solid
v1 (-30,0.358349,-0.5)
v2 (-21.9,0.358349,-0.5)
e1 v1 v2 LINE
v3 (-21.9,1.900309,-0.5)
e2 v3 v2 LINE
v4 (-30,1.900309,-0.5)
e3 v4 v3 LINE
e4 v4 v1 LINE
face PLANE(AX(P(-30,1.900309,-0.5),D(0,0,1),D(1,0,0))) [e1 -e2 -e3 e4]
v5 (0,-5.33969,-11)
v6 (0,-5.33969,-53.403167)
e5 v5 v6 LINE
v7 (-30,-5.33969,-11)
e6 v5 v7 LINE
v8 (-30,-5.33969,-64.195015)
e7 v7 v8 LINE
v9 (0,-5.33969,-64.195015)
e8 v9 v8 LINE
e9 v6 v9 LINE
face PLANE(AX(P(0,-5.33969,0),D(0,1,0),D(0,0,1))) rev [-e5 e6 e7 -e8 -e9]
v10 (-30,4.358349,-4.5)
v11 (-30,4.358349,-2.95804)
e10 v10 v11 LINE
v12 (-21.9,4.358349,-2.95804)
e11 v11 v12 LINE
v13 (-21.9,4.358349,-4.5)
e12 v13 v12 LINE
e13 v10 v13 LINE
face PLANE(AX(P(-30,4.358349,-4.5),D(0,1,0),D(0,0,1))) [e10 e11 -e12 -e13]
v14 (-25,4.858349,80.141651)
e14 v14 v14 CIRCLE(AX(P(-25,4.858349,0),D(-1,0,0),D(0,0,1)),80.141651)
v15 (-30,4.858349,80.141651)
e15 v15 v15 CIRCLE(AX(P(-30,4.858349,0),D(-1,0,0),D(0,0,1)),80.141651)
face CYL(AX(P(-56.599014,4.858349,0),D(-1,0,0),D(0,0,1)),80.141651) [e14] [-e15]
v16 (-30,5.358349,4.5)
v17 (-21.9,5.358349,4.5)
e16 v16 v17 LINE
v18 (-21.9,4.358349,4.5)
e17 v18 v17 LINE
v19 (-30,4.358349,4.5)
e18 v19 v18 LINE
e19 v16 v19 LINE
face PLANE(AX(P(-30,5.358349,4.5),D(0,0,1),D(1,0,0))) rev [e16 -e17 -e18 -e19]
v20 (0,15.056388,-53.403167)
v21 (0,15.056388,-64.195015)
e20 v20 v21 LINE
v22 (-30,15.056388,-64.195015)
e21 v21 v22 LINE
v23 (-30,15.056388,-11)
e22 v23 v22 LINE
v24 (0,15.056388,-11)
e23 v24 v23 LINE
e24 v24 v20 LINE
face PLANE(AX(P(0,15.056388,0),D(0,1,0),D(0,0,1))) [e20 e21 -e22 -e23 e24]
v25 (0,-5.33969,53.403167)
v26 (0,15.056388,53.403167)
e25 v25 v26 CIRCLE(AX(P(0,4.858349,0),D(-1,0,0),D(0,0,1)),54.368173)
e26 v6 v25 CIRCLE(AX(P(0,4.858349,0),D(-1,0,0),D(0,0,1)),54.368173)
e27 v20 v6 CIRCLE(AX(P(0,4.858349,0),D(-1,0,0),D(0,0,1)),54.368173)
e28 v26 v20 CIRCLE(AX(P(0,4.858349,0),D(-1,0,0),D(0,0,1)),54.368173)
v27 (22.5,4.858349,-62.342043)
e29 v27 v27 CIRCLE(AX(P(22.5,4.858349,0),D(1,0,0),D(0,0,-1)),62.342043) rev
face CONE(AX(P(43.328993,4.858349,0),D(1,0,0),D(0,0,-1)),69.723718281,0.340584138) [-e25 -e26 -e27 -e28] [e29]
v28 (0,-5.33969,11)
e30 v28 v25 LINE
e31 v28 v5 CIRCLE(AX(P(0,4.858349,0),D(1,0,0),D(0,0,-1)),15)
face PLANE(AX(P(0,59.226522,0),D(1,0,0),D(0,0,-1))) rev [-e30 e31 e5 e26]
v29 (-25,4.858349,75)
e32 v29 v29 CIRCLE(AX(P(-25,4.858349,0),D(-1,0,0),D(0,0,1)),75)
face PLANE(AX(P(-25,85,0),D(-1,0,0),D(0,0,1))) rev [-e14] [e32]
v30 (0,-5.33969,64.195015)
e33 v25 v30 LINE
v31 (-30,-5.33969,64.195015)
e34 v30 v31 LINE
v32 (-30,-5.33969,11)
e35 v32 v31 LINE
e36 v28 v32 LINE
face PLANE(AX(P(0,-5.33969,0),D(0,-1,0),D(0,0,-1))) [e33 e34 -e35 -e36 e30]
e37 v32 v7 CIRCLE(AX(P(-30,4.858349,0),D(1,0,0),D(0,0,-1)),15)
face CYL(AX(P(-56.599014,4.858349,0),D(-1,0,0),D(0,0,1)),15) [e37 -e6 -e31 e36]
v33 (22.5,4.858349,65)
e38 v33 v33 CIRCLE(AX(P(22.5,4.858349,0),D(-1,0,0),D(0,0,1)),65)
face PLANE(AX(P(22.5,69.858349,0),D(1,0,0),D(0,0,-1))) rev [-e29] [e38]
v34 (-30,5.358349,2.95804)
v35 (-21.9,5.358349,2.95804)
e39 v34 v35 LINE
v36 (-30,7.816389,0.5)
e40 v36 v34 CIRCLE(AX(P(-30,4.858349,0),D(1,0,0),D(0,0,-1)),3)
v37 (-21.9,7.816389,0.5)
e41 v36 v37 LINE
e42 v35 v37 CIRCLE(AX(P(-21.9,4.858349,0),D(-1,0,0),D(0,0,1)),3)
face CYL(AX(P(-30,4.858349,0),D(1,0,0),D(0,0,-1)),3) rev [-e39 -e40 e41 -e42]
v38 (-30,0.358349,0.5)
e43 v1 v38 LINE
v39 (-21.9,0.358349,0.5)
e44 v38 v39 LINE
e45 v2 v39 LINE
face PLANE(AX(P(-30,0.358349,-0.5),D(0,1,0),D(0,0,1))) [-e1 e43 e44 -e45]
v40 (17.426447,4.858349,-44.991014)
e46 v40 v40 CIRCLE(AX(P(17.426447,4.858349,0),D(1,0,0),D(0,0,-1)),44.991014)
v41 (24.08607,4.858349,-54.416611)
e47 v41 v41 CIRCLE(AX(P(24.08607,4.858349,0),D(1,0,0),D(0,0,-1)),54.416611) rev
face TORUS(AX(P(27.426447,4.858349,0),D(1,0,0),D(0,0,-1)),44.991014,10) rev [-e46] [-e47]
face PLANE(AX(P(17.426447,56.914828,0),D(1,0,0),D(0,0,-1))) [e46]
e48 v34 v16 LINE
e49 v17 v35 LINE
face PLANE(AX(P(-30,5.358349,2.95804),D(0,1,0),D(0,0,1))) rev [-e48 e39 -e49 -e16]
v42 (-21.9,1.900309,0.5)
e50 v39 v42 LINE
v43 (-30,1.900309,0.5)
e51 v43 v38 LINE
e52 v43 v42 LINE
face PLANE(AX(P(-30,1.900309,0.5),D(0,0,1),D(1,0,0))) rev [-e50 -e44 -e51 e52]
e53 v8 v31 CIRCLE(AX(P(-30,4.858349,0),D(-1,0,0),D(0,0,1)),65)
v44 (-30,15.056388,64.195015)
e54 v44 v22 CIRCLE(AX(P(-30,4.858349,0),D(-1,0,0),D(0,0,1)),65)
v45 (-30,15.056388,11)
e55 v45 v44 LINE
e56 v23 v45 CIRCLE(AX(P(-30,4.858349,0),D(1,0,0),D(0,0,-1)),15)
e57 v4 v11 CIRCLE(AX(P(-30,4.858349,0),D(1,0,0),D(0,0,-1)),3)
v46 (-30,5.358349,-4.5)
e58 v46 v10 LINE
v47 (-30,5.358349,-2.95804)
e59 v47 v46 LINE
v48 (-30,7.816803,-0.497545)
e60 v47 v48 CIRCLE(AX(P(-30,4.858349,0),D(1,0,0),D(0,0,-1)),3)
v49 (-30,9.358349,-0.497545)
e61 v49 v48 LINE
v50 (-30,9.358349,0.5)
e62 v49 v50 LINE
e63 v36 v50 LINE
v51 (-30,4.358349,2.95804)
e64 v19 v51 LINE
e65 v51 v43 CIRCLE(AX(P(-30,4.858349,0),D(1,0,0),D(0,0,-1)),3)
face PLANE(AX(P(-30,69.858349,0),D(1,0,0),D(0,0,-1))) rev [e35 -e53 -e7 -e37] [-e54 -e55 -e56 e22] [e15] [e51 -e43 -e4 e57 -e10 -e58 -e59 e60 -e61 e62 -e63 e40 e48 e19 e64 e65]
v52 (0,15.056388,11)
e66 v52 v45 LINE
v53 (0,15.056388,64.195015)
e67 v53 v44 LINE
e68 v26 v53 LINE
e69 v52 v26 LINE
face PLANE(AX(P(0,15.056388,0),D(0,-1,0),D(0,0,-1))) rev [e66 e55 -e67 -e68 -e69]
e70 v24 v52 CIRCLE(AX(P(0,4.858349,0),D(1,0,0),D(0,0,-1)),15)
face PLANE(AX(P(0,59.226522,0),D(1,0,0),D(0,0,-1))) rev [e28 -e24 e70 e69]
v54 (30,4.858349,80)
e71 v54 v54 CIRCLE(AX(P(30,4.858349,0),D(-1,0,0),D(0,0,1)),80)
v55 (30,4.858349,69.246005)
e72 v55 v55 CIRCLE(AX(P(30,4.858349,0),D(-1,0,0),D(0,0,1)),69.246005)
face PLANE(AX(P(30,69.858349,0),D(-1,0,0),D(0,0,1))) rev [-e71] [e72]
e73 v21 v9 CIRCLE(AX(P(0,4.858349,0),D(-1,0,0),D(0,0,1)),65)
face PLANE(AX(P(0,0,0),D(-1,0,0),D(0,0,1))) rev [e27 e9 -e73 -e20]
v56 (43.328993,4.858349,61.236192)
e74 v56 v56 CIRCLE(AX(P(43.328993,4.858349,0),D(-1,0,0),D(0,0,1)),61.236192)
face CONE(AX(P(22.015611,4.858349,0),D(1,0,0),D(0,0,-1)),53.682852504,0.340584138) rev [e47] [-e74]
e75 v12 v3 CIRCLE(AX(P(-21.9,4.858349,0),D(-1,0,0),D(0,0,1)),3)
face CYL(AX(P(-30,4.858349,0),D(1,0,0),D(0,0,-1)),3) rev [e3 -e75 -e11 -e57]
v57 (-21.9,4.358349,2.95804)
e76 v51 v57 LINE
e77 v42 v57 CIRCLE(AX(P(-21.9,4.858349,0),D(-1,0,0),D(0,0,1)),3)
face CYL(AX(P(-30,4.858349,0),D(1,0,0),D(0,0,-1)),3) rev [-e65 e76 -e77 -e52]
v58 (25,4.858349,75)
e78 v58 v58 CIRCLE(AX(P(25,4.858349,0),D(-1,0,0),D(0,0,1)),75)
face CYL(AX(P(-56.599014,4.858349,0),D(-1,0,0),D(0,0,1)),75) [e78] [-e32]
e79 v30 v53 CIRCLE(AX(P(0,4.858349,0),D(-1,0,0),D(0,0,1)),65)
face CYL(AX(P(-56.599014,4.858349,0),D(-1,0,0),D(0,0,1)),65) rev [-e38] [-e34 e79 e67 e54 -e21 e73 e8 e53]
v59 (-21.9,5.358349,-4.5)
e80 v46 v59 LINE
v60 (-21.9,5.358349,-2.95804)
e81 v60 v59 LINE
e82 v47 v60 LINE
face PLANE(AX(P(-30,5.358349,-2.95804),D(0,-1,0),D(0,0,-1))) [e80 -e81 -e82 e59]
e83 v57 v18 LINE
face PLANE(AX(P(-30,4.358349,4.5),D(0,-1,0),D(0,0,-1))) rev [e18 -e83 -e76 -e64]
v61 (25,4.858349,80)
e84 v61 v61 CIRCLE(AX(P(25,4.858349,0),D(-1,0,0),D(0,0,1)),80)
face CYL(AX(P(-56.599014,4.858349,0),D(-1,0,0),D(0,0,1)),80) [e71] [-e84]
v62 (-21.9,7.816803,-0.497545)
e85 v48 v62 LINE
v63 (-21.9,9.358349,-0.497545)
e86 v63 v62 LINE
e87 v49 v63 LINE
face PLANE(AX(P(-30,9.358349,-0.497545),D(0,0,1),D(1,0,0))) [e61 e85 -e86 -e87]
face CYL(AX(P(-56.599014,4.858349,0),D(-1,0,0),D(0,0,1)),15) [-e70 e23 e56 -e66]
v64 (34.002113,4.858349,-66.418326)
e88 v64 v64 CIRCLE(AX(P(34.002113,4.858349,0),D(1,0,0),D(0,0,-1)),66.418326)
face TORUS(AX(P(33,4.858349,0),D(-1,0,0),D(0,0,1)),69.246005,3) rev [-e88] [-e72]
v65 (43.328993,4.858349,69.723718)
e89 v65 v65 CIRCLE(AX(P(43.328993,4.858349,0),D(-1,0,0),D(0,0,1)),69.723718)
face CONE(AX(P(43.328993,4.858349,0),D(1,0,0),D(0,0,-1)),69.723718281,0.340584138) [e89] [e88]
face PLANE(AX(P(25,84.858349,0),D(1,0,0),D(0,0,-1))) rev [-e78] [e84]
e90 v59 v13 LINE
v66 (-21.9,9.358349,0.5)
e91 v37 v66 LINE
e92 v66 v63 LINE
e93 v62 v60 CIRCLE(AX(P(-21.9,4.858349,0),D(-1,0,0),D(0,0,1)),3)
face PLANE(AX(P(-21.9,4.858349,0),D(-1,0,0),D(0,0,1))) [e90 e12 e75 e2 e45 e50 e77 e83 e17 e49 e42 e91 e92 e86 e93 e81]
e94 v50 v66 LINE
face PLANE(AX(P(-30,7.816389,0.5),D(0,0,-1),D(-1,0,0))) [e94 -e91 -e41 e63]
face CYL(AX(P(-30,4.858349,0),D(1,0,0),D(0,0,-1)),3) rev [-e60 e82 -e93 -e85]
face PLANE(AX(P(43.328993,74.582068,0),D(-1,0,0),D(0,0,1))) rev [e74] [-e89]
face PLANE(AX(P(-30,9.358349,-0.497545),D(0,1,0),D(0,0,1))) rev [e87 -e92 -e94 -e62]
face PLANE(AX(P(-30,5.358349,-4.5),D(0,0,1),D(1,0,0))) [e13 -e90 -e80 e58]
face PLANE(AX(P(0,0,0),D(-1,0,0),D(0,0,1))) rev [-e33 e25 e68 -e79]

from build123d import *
from build123d.topology import SkipClean

# Parameters (mm, degrees)
ESBO_O2_R                = 15
RESSALTO_EXTRUS_O1_DEPTH = 30
FILETE1_R                = 10
FILETE5_R                = 3
RESSALTO_EXTRUS_O3_DEPTH = 30
RESSALTO_EXTRUS_O4_START = -30
ESBO_O9_R                = 3
RESSALTO_EXTRUS_O4_DEPTH = 30
ESBO_O10_R               = 3
RESSALTO_EXTRUS_O5_DEPTH = 2
CORTE_EXTRUS_O1_START    = -0.3
ESBO_O14_R               = 3
CORTE_EXTRUS_O1_DEPTH    = 0.3
RESSALTO_EXTRUS_O6_START = -27
RESSALTO_EXTRUS_O6_DEPTH = 27


with BuildPart() as part:
    # Esboço1 → Revolução2 (revolve)
    with BuildSketch(Plane.XY, mode=Mode.PRIVATE) as revolu_o2_sk:
        Polygon((30, 69.858349347), (30, 4.858349347), (0, 4.858349347), (0, 19.858349347), (22.5, 19.858349347), (22.5, 69.858349347), (-30, 69.858349347), (-30, 85), (-25, 85), (-25, 79.858349347), (25, 79.858349347), (25, 84.858349347), (30, 84.858349347), align=None)
    revolve(revolu_o2_sk.sketch.rotate(Axis((-56.599013794, 4.858349347, 0), (1, 0, 0)), 90), axis=Axis((-56.599013794, 4.858349347, 0), (1, 0, 0)))

    # Esboço2 → Ressalto-extrusão1 (add)
    with BuildSketch(Plane(origin=(0, 0, 0), x_dir=(0, 0, -1), z_dir=(1, 0, 0))):
        with Locations(Location((0, 4.858349347, 0), (0, 0, 180))):
            Circle(ESBO_O2_R)
        with BuildLine():
            Line((-2.958039892, 5.358349347), (-4.5, 5.358349347))
            Line((-4.5, 5.358349347), (-4.5, 4.358349347))
            Line((-4.5, 4.358349347), (-2.958039892, 4.358349347))
            ThreePointArc((-2.958039892, 4.358349347), (-2.121320344, 2.737029004), (-0.5, 1.900309456))
            Line((-0.5, 1.900309456), (-0.5, 0.358349347))
            Line((-0.5, 0.358349347), (0.5, 0.358349347))
            Line((0.5, 0.358349347), (0.5, 1.900309456))
            ThreePointArc((0.5, 1.900309456), (2.121320344, 2.737029004), (2.958039892, 4.358349347))
            Line((2.958039892, 4.358349347), (4.5, 4.358349347))
            Line((4.5, 4.358349347), (4.5, 5.358349347))
            Line((4.5, 5.358349347), (2.958039892, 5.358349347))
            ThreePointArc((2.958039892, 5.358349347), (2.120440089, 6.98054958), (0.497545425, 7.81680309))
            Line((0.497545425, 7.81680309), (0.497545425, 9.358349347))
            Line((0.497545425, 9.358349347), (-0.5, 9.358349347))
            Line((-0.5, 9.358349347), (-0.5, 7.816389239))
            ThreePointArc((-0.5, 7.816389239), (-2.121320344, 6.979669691), (-2.958039892, 5.358349347))
        make_face(mode=Mode.SUBTRACT)
    extrude(amount=-RESSALTO_EXTRUS_O1_DEPTH)

    # Esboço4 → Revolução3 (revolve)
    with BuildSketch(Plane.XY, mode=Mode.PRIVATE) as revolu_o3_sk:
        Polygon((0, 59.226522002), (0, 4.858349347), (43.32899264, 4.858349347), (43.32899264, 74.582067629), align=None)
    revolve(revolu_o3_sk.sketch.rotate(Axis((-90.113441675, 4.858349347, 0), (1, 0, 0)), 270), axis=Axis((-90.113441675, 4.858349347, 0), (1, 0, 0)))

    # Esboço5 → Corte-Revolução3 (revolve, cut)
    with BuildSketch(Plane.XY, mode=Mode.PRIVATE) as corte_revolu_o3_sk:
        Polygon((43.32899264, 4.858349347), (43.32899264, 66.094541607), (32.672301871, 62.317871729), (22.015611102, 58.541201852), (17.426446921, 56.914828477), (17.426446921, 4.858349347), align=None)
    revolve(corte_revolu_o3_sk.sketch.rotate(Axis((17.426446921, 4.858349347, 0), (1, 0, 0)), 90), axis=Axis((17.426446921, 4.858349347, 0), (1, 0, 0)), mode=Mode.SUBTRACT)

    # Filete1
    filete1_edges = [part.edges().sort_by_distance(p)[0] for p in [
        (17.426446921, 4.858349347, -52.05647913),
    ]]
    fillet(filete1_edges, radius=FILETE1_R)

    # Filete5
    filete5_edges = [part.edges().sort_by_distance(p)[0] for p in [
        (30, 4.858349347, 65),
    ]]
    fillet(filete5_edges, radius=FILETE5_R)

    # Esboço7 → Ressalto-extrusão3 (add)
    with BuildSketch(Plane.ZY.offset(30)):
        with BuildLine():
            Line((-11, 15.056388374), (-64.195015383, 15.056388374))
            ThreePointArc((-64.195015383, 15.056388374), (-65, 4.858349347), (-64.195015383, -5.33968968))
            Line((-64.195015383, -5.33968968), (-11, -5.33968968))
            ThreePointArc((-11, -5.33968968), (-15, 4.858349347), (-11, 15.056388374))
        make_face()
        with BuildLine():
            Line((11, -5.33968968), (64.195015383, -5.33968968))
            ThreePointArc((64.195015383, -5.33968968), (65, 4.858349347), (64.195015383, 15.056388374))
            Line((64.195015383, 15.056388374), (11, 15.056388374))
            ThreePointArc((11, 15.056388374), (15, 4.858349347), (11, -5.33968968))
        make_face()
    extrude(amount=-RESSALTO_EXTRUS_O3_DEPTH)

    # Esboço9 → Ressalto-extrusão4 (add)
    with BuildSketch(Plane.ZY.offset(20.2).offset(RESSALTO_EXTRUS_O4_START)):
        with Locations((0, 4.858349347)):
            Circle(ESBO_O9_R)
    extrude(amount=RESSALTO_EXTRUS_O4_DEPTH)

    # Esboço10 → Ressalto-extrusão5 (add)
    with BuildSketch(Plane.ZY.offset(20.2)):
        with Locations((0, 4.858349347)):
            Circle(ESBO_O10_R)
    extrude(amount=RESSALTO_EXTRUS_O5_DEPTH)

    # Esboço14 → Corte-extrusão1 (cut)
    with SkipClean():  # the faces are left unmerged after this step: merging them gives an invalid solid
        with BuildSketch(Plane.ZY.offset(22.2).offset(CORTE_EXTRUS_O1_START)):
            with Locations((0, 4.858349347)):
                Circle(ESBO_O14_R)
        extrude(amount=CORTE_EXTRUS_O1_DEPTH, mode=Mode.SUBTRACT)
    add(part.part.scale(1), mode=Mode.REPLACE)  # the faces are merged on a copy

    # Esboço15 → Ressalto-extrusão6 (add)
    with SkipClean():  # the faces are left unmerged after this step: merging them gives an invalid solid
        with BuildSketch(Plane.ZY.offset(21.9).offset(RESSALTO_EXTRUS_O6_START)):
            with BuildLine():
                Line((-2.958039892, 5.358349347), (-4.5, 5.358349347))
                Line((-4.5, 5.358349347), (-4.5, 4.358349347))
                Line((-4.5, 4.358349347), (-2.958039892, 4.358349347))
                ThreePointArc((-2.958039892, 4.358349347), (-3, 4.858349347), (-2.958039892, 5.358349347))
            make_face()
            with BuildLine():
                Line((0.5, 7.816389239), (0.5, 9.358349347))
                Line((0.5, 9.358349347), (-0.497545425, 9.358349347))
                Line((-0.497545425, 9.358349347), (-0.497545425, 7.81680309))
                ThreePointArc((-0.497545425, 7.81680309), (0.00124461, 7.858349089), (0.5, 7.816389239))
            make_face()
            with BuildLine():
                Line((2.958039892, 4.358349347), (4.5, 4.358349347))
                Line((4.5, 4.358349347), (4.5, 5.358349347))
                Line((4.5, 5.358349347), (2.958039892, 5.358349347))
                ThreePointArc((2.958039892, 5.358349347), (3, 4.858349347), (2.958039892, 4.358349347))
            make_face()
            with BuildLine():
                ThreePointArc((2.958039892, 4.358349347), (3, 4.858349347), (2.958039892, 5.358349347))
                ThreePointArc((2.958039892, 5.358349347), (2.121320344, 6.979669691), (0.5, 7.816389239))
                ThreePointArc((0.5, 7.816389239), (0.00124461, 7.858349089), (-0.497545425, 7.81680309))
                ThreePointArc((-0.497545425, 7.81680309), (-2.120440089, 6.98054958), (-2.958039892, 5.358349347))
                ThreePointArc((-2.958039892, 5.358349347), (-3, 4.858349347), (-2.958039892, 4.358349347))
                ThreePointArc((-2.958039892, 4.358349347), (-2.121320344, 2.737029004), (-0.5, 1.900309456))
                ThreePointArc((-0.5, 1.900309456), (0, 1.858349347), (0.5, 1.900309456))
                ThreePointArc((0.5, 1.900309456), (2.121320344, 2.737029004), (2.958039892, 4.358349347))
            make_face()
            with BuildLine():
                Line((-0.5, 1.900309456), (-0.5, 0.358349347))
                Line((-0.5, 0.358349347), (0.5, 0.358349347))
                Line((0.5, 0.358349347), (0.5, 1.900309456))
                ThreePointArc((0.5, 1.900309456), (0, 1.858349347), (-0.5, 1.900309456))
            make_face()
        extrude(amount=RESSALTO_EXTRUS_O6_DEPTH)


solid = part.part
